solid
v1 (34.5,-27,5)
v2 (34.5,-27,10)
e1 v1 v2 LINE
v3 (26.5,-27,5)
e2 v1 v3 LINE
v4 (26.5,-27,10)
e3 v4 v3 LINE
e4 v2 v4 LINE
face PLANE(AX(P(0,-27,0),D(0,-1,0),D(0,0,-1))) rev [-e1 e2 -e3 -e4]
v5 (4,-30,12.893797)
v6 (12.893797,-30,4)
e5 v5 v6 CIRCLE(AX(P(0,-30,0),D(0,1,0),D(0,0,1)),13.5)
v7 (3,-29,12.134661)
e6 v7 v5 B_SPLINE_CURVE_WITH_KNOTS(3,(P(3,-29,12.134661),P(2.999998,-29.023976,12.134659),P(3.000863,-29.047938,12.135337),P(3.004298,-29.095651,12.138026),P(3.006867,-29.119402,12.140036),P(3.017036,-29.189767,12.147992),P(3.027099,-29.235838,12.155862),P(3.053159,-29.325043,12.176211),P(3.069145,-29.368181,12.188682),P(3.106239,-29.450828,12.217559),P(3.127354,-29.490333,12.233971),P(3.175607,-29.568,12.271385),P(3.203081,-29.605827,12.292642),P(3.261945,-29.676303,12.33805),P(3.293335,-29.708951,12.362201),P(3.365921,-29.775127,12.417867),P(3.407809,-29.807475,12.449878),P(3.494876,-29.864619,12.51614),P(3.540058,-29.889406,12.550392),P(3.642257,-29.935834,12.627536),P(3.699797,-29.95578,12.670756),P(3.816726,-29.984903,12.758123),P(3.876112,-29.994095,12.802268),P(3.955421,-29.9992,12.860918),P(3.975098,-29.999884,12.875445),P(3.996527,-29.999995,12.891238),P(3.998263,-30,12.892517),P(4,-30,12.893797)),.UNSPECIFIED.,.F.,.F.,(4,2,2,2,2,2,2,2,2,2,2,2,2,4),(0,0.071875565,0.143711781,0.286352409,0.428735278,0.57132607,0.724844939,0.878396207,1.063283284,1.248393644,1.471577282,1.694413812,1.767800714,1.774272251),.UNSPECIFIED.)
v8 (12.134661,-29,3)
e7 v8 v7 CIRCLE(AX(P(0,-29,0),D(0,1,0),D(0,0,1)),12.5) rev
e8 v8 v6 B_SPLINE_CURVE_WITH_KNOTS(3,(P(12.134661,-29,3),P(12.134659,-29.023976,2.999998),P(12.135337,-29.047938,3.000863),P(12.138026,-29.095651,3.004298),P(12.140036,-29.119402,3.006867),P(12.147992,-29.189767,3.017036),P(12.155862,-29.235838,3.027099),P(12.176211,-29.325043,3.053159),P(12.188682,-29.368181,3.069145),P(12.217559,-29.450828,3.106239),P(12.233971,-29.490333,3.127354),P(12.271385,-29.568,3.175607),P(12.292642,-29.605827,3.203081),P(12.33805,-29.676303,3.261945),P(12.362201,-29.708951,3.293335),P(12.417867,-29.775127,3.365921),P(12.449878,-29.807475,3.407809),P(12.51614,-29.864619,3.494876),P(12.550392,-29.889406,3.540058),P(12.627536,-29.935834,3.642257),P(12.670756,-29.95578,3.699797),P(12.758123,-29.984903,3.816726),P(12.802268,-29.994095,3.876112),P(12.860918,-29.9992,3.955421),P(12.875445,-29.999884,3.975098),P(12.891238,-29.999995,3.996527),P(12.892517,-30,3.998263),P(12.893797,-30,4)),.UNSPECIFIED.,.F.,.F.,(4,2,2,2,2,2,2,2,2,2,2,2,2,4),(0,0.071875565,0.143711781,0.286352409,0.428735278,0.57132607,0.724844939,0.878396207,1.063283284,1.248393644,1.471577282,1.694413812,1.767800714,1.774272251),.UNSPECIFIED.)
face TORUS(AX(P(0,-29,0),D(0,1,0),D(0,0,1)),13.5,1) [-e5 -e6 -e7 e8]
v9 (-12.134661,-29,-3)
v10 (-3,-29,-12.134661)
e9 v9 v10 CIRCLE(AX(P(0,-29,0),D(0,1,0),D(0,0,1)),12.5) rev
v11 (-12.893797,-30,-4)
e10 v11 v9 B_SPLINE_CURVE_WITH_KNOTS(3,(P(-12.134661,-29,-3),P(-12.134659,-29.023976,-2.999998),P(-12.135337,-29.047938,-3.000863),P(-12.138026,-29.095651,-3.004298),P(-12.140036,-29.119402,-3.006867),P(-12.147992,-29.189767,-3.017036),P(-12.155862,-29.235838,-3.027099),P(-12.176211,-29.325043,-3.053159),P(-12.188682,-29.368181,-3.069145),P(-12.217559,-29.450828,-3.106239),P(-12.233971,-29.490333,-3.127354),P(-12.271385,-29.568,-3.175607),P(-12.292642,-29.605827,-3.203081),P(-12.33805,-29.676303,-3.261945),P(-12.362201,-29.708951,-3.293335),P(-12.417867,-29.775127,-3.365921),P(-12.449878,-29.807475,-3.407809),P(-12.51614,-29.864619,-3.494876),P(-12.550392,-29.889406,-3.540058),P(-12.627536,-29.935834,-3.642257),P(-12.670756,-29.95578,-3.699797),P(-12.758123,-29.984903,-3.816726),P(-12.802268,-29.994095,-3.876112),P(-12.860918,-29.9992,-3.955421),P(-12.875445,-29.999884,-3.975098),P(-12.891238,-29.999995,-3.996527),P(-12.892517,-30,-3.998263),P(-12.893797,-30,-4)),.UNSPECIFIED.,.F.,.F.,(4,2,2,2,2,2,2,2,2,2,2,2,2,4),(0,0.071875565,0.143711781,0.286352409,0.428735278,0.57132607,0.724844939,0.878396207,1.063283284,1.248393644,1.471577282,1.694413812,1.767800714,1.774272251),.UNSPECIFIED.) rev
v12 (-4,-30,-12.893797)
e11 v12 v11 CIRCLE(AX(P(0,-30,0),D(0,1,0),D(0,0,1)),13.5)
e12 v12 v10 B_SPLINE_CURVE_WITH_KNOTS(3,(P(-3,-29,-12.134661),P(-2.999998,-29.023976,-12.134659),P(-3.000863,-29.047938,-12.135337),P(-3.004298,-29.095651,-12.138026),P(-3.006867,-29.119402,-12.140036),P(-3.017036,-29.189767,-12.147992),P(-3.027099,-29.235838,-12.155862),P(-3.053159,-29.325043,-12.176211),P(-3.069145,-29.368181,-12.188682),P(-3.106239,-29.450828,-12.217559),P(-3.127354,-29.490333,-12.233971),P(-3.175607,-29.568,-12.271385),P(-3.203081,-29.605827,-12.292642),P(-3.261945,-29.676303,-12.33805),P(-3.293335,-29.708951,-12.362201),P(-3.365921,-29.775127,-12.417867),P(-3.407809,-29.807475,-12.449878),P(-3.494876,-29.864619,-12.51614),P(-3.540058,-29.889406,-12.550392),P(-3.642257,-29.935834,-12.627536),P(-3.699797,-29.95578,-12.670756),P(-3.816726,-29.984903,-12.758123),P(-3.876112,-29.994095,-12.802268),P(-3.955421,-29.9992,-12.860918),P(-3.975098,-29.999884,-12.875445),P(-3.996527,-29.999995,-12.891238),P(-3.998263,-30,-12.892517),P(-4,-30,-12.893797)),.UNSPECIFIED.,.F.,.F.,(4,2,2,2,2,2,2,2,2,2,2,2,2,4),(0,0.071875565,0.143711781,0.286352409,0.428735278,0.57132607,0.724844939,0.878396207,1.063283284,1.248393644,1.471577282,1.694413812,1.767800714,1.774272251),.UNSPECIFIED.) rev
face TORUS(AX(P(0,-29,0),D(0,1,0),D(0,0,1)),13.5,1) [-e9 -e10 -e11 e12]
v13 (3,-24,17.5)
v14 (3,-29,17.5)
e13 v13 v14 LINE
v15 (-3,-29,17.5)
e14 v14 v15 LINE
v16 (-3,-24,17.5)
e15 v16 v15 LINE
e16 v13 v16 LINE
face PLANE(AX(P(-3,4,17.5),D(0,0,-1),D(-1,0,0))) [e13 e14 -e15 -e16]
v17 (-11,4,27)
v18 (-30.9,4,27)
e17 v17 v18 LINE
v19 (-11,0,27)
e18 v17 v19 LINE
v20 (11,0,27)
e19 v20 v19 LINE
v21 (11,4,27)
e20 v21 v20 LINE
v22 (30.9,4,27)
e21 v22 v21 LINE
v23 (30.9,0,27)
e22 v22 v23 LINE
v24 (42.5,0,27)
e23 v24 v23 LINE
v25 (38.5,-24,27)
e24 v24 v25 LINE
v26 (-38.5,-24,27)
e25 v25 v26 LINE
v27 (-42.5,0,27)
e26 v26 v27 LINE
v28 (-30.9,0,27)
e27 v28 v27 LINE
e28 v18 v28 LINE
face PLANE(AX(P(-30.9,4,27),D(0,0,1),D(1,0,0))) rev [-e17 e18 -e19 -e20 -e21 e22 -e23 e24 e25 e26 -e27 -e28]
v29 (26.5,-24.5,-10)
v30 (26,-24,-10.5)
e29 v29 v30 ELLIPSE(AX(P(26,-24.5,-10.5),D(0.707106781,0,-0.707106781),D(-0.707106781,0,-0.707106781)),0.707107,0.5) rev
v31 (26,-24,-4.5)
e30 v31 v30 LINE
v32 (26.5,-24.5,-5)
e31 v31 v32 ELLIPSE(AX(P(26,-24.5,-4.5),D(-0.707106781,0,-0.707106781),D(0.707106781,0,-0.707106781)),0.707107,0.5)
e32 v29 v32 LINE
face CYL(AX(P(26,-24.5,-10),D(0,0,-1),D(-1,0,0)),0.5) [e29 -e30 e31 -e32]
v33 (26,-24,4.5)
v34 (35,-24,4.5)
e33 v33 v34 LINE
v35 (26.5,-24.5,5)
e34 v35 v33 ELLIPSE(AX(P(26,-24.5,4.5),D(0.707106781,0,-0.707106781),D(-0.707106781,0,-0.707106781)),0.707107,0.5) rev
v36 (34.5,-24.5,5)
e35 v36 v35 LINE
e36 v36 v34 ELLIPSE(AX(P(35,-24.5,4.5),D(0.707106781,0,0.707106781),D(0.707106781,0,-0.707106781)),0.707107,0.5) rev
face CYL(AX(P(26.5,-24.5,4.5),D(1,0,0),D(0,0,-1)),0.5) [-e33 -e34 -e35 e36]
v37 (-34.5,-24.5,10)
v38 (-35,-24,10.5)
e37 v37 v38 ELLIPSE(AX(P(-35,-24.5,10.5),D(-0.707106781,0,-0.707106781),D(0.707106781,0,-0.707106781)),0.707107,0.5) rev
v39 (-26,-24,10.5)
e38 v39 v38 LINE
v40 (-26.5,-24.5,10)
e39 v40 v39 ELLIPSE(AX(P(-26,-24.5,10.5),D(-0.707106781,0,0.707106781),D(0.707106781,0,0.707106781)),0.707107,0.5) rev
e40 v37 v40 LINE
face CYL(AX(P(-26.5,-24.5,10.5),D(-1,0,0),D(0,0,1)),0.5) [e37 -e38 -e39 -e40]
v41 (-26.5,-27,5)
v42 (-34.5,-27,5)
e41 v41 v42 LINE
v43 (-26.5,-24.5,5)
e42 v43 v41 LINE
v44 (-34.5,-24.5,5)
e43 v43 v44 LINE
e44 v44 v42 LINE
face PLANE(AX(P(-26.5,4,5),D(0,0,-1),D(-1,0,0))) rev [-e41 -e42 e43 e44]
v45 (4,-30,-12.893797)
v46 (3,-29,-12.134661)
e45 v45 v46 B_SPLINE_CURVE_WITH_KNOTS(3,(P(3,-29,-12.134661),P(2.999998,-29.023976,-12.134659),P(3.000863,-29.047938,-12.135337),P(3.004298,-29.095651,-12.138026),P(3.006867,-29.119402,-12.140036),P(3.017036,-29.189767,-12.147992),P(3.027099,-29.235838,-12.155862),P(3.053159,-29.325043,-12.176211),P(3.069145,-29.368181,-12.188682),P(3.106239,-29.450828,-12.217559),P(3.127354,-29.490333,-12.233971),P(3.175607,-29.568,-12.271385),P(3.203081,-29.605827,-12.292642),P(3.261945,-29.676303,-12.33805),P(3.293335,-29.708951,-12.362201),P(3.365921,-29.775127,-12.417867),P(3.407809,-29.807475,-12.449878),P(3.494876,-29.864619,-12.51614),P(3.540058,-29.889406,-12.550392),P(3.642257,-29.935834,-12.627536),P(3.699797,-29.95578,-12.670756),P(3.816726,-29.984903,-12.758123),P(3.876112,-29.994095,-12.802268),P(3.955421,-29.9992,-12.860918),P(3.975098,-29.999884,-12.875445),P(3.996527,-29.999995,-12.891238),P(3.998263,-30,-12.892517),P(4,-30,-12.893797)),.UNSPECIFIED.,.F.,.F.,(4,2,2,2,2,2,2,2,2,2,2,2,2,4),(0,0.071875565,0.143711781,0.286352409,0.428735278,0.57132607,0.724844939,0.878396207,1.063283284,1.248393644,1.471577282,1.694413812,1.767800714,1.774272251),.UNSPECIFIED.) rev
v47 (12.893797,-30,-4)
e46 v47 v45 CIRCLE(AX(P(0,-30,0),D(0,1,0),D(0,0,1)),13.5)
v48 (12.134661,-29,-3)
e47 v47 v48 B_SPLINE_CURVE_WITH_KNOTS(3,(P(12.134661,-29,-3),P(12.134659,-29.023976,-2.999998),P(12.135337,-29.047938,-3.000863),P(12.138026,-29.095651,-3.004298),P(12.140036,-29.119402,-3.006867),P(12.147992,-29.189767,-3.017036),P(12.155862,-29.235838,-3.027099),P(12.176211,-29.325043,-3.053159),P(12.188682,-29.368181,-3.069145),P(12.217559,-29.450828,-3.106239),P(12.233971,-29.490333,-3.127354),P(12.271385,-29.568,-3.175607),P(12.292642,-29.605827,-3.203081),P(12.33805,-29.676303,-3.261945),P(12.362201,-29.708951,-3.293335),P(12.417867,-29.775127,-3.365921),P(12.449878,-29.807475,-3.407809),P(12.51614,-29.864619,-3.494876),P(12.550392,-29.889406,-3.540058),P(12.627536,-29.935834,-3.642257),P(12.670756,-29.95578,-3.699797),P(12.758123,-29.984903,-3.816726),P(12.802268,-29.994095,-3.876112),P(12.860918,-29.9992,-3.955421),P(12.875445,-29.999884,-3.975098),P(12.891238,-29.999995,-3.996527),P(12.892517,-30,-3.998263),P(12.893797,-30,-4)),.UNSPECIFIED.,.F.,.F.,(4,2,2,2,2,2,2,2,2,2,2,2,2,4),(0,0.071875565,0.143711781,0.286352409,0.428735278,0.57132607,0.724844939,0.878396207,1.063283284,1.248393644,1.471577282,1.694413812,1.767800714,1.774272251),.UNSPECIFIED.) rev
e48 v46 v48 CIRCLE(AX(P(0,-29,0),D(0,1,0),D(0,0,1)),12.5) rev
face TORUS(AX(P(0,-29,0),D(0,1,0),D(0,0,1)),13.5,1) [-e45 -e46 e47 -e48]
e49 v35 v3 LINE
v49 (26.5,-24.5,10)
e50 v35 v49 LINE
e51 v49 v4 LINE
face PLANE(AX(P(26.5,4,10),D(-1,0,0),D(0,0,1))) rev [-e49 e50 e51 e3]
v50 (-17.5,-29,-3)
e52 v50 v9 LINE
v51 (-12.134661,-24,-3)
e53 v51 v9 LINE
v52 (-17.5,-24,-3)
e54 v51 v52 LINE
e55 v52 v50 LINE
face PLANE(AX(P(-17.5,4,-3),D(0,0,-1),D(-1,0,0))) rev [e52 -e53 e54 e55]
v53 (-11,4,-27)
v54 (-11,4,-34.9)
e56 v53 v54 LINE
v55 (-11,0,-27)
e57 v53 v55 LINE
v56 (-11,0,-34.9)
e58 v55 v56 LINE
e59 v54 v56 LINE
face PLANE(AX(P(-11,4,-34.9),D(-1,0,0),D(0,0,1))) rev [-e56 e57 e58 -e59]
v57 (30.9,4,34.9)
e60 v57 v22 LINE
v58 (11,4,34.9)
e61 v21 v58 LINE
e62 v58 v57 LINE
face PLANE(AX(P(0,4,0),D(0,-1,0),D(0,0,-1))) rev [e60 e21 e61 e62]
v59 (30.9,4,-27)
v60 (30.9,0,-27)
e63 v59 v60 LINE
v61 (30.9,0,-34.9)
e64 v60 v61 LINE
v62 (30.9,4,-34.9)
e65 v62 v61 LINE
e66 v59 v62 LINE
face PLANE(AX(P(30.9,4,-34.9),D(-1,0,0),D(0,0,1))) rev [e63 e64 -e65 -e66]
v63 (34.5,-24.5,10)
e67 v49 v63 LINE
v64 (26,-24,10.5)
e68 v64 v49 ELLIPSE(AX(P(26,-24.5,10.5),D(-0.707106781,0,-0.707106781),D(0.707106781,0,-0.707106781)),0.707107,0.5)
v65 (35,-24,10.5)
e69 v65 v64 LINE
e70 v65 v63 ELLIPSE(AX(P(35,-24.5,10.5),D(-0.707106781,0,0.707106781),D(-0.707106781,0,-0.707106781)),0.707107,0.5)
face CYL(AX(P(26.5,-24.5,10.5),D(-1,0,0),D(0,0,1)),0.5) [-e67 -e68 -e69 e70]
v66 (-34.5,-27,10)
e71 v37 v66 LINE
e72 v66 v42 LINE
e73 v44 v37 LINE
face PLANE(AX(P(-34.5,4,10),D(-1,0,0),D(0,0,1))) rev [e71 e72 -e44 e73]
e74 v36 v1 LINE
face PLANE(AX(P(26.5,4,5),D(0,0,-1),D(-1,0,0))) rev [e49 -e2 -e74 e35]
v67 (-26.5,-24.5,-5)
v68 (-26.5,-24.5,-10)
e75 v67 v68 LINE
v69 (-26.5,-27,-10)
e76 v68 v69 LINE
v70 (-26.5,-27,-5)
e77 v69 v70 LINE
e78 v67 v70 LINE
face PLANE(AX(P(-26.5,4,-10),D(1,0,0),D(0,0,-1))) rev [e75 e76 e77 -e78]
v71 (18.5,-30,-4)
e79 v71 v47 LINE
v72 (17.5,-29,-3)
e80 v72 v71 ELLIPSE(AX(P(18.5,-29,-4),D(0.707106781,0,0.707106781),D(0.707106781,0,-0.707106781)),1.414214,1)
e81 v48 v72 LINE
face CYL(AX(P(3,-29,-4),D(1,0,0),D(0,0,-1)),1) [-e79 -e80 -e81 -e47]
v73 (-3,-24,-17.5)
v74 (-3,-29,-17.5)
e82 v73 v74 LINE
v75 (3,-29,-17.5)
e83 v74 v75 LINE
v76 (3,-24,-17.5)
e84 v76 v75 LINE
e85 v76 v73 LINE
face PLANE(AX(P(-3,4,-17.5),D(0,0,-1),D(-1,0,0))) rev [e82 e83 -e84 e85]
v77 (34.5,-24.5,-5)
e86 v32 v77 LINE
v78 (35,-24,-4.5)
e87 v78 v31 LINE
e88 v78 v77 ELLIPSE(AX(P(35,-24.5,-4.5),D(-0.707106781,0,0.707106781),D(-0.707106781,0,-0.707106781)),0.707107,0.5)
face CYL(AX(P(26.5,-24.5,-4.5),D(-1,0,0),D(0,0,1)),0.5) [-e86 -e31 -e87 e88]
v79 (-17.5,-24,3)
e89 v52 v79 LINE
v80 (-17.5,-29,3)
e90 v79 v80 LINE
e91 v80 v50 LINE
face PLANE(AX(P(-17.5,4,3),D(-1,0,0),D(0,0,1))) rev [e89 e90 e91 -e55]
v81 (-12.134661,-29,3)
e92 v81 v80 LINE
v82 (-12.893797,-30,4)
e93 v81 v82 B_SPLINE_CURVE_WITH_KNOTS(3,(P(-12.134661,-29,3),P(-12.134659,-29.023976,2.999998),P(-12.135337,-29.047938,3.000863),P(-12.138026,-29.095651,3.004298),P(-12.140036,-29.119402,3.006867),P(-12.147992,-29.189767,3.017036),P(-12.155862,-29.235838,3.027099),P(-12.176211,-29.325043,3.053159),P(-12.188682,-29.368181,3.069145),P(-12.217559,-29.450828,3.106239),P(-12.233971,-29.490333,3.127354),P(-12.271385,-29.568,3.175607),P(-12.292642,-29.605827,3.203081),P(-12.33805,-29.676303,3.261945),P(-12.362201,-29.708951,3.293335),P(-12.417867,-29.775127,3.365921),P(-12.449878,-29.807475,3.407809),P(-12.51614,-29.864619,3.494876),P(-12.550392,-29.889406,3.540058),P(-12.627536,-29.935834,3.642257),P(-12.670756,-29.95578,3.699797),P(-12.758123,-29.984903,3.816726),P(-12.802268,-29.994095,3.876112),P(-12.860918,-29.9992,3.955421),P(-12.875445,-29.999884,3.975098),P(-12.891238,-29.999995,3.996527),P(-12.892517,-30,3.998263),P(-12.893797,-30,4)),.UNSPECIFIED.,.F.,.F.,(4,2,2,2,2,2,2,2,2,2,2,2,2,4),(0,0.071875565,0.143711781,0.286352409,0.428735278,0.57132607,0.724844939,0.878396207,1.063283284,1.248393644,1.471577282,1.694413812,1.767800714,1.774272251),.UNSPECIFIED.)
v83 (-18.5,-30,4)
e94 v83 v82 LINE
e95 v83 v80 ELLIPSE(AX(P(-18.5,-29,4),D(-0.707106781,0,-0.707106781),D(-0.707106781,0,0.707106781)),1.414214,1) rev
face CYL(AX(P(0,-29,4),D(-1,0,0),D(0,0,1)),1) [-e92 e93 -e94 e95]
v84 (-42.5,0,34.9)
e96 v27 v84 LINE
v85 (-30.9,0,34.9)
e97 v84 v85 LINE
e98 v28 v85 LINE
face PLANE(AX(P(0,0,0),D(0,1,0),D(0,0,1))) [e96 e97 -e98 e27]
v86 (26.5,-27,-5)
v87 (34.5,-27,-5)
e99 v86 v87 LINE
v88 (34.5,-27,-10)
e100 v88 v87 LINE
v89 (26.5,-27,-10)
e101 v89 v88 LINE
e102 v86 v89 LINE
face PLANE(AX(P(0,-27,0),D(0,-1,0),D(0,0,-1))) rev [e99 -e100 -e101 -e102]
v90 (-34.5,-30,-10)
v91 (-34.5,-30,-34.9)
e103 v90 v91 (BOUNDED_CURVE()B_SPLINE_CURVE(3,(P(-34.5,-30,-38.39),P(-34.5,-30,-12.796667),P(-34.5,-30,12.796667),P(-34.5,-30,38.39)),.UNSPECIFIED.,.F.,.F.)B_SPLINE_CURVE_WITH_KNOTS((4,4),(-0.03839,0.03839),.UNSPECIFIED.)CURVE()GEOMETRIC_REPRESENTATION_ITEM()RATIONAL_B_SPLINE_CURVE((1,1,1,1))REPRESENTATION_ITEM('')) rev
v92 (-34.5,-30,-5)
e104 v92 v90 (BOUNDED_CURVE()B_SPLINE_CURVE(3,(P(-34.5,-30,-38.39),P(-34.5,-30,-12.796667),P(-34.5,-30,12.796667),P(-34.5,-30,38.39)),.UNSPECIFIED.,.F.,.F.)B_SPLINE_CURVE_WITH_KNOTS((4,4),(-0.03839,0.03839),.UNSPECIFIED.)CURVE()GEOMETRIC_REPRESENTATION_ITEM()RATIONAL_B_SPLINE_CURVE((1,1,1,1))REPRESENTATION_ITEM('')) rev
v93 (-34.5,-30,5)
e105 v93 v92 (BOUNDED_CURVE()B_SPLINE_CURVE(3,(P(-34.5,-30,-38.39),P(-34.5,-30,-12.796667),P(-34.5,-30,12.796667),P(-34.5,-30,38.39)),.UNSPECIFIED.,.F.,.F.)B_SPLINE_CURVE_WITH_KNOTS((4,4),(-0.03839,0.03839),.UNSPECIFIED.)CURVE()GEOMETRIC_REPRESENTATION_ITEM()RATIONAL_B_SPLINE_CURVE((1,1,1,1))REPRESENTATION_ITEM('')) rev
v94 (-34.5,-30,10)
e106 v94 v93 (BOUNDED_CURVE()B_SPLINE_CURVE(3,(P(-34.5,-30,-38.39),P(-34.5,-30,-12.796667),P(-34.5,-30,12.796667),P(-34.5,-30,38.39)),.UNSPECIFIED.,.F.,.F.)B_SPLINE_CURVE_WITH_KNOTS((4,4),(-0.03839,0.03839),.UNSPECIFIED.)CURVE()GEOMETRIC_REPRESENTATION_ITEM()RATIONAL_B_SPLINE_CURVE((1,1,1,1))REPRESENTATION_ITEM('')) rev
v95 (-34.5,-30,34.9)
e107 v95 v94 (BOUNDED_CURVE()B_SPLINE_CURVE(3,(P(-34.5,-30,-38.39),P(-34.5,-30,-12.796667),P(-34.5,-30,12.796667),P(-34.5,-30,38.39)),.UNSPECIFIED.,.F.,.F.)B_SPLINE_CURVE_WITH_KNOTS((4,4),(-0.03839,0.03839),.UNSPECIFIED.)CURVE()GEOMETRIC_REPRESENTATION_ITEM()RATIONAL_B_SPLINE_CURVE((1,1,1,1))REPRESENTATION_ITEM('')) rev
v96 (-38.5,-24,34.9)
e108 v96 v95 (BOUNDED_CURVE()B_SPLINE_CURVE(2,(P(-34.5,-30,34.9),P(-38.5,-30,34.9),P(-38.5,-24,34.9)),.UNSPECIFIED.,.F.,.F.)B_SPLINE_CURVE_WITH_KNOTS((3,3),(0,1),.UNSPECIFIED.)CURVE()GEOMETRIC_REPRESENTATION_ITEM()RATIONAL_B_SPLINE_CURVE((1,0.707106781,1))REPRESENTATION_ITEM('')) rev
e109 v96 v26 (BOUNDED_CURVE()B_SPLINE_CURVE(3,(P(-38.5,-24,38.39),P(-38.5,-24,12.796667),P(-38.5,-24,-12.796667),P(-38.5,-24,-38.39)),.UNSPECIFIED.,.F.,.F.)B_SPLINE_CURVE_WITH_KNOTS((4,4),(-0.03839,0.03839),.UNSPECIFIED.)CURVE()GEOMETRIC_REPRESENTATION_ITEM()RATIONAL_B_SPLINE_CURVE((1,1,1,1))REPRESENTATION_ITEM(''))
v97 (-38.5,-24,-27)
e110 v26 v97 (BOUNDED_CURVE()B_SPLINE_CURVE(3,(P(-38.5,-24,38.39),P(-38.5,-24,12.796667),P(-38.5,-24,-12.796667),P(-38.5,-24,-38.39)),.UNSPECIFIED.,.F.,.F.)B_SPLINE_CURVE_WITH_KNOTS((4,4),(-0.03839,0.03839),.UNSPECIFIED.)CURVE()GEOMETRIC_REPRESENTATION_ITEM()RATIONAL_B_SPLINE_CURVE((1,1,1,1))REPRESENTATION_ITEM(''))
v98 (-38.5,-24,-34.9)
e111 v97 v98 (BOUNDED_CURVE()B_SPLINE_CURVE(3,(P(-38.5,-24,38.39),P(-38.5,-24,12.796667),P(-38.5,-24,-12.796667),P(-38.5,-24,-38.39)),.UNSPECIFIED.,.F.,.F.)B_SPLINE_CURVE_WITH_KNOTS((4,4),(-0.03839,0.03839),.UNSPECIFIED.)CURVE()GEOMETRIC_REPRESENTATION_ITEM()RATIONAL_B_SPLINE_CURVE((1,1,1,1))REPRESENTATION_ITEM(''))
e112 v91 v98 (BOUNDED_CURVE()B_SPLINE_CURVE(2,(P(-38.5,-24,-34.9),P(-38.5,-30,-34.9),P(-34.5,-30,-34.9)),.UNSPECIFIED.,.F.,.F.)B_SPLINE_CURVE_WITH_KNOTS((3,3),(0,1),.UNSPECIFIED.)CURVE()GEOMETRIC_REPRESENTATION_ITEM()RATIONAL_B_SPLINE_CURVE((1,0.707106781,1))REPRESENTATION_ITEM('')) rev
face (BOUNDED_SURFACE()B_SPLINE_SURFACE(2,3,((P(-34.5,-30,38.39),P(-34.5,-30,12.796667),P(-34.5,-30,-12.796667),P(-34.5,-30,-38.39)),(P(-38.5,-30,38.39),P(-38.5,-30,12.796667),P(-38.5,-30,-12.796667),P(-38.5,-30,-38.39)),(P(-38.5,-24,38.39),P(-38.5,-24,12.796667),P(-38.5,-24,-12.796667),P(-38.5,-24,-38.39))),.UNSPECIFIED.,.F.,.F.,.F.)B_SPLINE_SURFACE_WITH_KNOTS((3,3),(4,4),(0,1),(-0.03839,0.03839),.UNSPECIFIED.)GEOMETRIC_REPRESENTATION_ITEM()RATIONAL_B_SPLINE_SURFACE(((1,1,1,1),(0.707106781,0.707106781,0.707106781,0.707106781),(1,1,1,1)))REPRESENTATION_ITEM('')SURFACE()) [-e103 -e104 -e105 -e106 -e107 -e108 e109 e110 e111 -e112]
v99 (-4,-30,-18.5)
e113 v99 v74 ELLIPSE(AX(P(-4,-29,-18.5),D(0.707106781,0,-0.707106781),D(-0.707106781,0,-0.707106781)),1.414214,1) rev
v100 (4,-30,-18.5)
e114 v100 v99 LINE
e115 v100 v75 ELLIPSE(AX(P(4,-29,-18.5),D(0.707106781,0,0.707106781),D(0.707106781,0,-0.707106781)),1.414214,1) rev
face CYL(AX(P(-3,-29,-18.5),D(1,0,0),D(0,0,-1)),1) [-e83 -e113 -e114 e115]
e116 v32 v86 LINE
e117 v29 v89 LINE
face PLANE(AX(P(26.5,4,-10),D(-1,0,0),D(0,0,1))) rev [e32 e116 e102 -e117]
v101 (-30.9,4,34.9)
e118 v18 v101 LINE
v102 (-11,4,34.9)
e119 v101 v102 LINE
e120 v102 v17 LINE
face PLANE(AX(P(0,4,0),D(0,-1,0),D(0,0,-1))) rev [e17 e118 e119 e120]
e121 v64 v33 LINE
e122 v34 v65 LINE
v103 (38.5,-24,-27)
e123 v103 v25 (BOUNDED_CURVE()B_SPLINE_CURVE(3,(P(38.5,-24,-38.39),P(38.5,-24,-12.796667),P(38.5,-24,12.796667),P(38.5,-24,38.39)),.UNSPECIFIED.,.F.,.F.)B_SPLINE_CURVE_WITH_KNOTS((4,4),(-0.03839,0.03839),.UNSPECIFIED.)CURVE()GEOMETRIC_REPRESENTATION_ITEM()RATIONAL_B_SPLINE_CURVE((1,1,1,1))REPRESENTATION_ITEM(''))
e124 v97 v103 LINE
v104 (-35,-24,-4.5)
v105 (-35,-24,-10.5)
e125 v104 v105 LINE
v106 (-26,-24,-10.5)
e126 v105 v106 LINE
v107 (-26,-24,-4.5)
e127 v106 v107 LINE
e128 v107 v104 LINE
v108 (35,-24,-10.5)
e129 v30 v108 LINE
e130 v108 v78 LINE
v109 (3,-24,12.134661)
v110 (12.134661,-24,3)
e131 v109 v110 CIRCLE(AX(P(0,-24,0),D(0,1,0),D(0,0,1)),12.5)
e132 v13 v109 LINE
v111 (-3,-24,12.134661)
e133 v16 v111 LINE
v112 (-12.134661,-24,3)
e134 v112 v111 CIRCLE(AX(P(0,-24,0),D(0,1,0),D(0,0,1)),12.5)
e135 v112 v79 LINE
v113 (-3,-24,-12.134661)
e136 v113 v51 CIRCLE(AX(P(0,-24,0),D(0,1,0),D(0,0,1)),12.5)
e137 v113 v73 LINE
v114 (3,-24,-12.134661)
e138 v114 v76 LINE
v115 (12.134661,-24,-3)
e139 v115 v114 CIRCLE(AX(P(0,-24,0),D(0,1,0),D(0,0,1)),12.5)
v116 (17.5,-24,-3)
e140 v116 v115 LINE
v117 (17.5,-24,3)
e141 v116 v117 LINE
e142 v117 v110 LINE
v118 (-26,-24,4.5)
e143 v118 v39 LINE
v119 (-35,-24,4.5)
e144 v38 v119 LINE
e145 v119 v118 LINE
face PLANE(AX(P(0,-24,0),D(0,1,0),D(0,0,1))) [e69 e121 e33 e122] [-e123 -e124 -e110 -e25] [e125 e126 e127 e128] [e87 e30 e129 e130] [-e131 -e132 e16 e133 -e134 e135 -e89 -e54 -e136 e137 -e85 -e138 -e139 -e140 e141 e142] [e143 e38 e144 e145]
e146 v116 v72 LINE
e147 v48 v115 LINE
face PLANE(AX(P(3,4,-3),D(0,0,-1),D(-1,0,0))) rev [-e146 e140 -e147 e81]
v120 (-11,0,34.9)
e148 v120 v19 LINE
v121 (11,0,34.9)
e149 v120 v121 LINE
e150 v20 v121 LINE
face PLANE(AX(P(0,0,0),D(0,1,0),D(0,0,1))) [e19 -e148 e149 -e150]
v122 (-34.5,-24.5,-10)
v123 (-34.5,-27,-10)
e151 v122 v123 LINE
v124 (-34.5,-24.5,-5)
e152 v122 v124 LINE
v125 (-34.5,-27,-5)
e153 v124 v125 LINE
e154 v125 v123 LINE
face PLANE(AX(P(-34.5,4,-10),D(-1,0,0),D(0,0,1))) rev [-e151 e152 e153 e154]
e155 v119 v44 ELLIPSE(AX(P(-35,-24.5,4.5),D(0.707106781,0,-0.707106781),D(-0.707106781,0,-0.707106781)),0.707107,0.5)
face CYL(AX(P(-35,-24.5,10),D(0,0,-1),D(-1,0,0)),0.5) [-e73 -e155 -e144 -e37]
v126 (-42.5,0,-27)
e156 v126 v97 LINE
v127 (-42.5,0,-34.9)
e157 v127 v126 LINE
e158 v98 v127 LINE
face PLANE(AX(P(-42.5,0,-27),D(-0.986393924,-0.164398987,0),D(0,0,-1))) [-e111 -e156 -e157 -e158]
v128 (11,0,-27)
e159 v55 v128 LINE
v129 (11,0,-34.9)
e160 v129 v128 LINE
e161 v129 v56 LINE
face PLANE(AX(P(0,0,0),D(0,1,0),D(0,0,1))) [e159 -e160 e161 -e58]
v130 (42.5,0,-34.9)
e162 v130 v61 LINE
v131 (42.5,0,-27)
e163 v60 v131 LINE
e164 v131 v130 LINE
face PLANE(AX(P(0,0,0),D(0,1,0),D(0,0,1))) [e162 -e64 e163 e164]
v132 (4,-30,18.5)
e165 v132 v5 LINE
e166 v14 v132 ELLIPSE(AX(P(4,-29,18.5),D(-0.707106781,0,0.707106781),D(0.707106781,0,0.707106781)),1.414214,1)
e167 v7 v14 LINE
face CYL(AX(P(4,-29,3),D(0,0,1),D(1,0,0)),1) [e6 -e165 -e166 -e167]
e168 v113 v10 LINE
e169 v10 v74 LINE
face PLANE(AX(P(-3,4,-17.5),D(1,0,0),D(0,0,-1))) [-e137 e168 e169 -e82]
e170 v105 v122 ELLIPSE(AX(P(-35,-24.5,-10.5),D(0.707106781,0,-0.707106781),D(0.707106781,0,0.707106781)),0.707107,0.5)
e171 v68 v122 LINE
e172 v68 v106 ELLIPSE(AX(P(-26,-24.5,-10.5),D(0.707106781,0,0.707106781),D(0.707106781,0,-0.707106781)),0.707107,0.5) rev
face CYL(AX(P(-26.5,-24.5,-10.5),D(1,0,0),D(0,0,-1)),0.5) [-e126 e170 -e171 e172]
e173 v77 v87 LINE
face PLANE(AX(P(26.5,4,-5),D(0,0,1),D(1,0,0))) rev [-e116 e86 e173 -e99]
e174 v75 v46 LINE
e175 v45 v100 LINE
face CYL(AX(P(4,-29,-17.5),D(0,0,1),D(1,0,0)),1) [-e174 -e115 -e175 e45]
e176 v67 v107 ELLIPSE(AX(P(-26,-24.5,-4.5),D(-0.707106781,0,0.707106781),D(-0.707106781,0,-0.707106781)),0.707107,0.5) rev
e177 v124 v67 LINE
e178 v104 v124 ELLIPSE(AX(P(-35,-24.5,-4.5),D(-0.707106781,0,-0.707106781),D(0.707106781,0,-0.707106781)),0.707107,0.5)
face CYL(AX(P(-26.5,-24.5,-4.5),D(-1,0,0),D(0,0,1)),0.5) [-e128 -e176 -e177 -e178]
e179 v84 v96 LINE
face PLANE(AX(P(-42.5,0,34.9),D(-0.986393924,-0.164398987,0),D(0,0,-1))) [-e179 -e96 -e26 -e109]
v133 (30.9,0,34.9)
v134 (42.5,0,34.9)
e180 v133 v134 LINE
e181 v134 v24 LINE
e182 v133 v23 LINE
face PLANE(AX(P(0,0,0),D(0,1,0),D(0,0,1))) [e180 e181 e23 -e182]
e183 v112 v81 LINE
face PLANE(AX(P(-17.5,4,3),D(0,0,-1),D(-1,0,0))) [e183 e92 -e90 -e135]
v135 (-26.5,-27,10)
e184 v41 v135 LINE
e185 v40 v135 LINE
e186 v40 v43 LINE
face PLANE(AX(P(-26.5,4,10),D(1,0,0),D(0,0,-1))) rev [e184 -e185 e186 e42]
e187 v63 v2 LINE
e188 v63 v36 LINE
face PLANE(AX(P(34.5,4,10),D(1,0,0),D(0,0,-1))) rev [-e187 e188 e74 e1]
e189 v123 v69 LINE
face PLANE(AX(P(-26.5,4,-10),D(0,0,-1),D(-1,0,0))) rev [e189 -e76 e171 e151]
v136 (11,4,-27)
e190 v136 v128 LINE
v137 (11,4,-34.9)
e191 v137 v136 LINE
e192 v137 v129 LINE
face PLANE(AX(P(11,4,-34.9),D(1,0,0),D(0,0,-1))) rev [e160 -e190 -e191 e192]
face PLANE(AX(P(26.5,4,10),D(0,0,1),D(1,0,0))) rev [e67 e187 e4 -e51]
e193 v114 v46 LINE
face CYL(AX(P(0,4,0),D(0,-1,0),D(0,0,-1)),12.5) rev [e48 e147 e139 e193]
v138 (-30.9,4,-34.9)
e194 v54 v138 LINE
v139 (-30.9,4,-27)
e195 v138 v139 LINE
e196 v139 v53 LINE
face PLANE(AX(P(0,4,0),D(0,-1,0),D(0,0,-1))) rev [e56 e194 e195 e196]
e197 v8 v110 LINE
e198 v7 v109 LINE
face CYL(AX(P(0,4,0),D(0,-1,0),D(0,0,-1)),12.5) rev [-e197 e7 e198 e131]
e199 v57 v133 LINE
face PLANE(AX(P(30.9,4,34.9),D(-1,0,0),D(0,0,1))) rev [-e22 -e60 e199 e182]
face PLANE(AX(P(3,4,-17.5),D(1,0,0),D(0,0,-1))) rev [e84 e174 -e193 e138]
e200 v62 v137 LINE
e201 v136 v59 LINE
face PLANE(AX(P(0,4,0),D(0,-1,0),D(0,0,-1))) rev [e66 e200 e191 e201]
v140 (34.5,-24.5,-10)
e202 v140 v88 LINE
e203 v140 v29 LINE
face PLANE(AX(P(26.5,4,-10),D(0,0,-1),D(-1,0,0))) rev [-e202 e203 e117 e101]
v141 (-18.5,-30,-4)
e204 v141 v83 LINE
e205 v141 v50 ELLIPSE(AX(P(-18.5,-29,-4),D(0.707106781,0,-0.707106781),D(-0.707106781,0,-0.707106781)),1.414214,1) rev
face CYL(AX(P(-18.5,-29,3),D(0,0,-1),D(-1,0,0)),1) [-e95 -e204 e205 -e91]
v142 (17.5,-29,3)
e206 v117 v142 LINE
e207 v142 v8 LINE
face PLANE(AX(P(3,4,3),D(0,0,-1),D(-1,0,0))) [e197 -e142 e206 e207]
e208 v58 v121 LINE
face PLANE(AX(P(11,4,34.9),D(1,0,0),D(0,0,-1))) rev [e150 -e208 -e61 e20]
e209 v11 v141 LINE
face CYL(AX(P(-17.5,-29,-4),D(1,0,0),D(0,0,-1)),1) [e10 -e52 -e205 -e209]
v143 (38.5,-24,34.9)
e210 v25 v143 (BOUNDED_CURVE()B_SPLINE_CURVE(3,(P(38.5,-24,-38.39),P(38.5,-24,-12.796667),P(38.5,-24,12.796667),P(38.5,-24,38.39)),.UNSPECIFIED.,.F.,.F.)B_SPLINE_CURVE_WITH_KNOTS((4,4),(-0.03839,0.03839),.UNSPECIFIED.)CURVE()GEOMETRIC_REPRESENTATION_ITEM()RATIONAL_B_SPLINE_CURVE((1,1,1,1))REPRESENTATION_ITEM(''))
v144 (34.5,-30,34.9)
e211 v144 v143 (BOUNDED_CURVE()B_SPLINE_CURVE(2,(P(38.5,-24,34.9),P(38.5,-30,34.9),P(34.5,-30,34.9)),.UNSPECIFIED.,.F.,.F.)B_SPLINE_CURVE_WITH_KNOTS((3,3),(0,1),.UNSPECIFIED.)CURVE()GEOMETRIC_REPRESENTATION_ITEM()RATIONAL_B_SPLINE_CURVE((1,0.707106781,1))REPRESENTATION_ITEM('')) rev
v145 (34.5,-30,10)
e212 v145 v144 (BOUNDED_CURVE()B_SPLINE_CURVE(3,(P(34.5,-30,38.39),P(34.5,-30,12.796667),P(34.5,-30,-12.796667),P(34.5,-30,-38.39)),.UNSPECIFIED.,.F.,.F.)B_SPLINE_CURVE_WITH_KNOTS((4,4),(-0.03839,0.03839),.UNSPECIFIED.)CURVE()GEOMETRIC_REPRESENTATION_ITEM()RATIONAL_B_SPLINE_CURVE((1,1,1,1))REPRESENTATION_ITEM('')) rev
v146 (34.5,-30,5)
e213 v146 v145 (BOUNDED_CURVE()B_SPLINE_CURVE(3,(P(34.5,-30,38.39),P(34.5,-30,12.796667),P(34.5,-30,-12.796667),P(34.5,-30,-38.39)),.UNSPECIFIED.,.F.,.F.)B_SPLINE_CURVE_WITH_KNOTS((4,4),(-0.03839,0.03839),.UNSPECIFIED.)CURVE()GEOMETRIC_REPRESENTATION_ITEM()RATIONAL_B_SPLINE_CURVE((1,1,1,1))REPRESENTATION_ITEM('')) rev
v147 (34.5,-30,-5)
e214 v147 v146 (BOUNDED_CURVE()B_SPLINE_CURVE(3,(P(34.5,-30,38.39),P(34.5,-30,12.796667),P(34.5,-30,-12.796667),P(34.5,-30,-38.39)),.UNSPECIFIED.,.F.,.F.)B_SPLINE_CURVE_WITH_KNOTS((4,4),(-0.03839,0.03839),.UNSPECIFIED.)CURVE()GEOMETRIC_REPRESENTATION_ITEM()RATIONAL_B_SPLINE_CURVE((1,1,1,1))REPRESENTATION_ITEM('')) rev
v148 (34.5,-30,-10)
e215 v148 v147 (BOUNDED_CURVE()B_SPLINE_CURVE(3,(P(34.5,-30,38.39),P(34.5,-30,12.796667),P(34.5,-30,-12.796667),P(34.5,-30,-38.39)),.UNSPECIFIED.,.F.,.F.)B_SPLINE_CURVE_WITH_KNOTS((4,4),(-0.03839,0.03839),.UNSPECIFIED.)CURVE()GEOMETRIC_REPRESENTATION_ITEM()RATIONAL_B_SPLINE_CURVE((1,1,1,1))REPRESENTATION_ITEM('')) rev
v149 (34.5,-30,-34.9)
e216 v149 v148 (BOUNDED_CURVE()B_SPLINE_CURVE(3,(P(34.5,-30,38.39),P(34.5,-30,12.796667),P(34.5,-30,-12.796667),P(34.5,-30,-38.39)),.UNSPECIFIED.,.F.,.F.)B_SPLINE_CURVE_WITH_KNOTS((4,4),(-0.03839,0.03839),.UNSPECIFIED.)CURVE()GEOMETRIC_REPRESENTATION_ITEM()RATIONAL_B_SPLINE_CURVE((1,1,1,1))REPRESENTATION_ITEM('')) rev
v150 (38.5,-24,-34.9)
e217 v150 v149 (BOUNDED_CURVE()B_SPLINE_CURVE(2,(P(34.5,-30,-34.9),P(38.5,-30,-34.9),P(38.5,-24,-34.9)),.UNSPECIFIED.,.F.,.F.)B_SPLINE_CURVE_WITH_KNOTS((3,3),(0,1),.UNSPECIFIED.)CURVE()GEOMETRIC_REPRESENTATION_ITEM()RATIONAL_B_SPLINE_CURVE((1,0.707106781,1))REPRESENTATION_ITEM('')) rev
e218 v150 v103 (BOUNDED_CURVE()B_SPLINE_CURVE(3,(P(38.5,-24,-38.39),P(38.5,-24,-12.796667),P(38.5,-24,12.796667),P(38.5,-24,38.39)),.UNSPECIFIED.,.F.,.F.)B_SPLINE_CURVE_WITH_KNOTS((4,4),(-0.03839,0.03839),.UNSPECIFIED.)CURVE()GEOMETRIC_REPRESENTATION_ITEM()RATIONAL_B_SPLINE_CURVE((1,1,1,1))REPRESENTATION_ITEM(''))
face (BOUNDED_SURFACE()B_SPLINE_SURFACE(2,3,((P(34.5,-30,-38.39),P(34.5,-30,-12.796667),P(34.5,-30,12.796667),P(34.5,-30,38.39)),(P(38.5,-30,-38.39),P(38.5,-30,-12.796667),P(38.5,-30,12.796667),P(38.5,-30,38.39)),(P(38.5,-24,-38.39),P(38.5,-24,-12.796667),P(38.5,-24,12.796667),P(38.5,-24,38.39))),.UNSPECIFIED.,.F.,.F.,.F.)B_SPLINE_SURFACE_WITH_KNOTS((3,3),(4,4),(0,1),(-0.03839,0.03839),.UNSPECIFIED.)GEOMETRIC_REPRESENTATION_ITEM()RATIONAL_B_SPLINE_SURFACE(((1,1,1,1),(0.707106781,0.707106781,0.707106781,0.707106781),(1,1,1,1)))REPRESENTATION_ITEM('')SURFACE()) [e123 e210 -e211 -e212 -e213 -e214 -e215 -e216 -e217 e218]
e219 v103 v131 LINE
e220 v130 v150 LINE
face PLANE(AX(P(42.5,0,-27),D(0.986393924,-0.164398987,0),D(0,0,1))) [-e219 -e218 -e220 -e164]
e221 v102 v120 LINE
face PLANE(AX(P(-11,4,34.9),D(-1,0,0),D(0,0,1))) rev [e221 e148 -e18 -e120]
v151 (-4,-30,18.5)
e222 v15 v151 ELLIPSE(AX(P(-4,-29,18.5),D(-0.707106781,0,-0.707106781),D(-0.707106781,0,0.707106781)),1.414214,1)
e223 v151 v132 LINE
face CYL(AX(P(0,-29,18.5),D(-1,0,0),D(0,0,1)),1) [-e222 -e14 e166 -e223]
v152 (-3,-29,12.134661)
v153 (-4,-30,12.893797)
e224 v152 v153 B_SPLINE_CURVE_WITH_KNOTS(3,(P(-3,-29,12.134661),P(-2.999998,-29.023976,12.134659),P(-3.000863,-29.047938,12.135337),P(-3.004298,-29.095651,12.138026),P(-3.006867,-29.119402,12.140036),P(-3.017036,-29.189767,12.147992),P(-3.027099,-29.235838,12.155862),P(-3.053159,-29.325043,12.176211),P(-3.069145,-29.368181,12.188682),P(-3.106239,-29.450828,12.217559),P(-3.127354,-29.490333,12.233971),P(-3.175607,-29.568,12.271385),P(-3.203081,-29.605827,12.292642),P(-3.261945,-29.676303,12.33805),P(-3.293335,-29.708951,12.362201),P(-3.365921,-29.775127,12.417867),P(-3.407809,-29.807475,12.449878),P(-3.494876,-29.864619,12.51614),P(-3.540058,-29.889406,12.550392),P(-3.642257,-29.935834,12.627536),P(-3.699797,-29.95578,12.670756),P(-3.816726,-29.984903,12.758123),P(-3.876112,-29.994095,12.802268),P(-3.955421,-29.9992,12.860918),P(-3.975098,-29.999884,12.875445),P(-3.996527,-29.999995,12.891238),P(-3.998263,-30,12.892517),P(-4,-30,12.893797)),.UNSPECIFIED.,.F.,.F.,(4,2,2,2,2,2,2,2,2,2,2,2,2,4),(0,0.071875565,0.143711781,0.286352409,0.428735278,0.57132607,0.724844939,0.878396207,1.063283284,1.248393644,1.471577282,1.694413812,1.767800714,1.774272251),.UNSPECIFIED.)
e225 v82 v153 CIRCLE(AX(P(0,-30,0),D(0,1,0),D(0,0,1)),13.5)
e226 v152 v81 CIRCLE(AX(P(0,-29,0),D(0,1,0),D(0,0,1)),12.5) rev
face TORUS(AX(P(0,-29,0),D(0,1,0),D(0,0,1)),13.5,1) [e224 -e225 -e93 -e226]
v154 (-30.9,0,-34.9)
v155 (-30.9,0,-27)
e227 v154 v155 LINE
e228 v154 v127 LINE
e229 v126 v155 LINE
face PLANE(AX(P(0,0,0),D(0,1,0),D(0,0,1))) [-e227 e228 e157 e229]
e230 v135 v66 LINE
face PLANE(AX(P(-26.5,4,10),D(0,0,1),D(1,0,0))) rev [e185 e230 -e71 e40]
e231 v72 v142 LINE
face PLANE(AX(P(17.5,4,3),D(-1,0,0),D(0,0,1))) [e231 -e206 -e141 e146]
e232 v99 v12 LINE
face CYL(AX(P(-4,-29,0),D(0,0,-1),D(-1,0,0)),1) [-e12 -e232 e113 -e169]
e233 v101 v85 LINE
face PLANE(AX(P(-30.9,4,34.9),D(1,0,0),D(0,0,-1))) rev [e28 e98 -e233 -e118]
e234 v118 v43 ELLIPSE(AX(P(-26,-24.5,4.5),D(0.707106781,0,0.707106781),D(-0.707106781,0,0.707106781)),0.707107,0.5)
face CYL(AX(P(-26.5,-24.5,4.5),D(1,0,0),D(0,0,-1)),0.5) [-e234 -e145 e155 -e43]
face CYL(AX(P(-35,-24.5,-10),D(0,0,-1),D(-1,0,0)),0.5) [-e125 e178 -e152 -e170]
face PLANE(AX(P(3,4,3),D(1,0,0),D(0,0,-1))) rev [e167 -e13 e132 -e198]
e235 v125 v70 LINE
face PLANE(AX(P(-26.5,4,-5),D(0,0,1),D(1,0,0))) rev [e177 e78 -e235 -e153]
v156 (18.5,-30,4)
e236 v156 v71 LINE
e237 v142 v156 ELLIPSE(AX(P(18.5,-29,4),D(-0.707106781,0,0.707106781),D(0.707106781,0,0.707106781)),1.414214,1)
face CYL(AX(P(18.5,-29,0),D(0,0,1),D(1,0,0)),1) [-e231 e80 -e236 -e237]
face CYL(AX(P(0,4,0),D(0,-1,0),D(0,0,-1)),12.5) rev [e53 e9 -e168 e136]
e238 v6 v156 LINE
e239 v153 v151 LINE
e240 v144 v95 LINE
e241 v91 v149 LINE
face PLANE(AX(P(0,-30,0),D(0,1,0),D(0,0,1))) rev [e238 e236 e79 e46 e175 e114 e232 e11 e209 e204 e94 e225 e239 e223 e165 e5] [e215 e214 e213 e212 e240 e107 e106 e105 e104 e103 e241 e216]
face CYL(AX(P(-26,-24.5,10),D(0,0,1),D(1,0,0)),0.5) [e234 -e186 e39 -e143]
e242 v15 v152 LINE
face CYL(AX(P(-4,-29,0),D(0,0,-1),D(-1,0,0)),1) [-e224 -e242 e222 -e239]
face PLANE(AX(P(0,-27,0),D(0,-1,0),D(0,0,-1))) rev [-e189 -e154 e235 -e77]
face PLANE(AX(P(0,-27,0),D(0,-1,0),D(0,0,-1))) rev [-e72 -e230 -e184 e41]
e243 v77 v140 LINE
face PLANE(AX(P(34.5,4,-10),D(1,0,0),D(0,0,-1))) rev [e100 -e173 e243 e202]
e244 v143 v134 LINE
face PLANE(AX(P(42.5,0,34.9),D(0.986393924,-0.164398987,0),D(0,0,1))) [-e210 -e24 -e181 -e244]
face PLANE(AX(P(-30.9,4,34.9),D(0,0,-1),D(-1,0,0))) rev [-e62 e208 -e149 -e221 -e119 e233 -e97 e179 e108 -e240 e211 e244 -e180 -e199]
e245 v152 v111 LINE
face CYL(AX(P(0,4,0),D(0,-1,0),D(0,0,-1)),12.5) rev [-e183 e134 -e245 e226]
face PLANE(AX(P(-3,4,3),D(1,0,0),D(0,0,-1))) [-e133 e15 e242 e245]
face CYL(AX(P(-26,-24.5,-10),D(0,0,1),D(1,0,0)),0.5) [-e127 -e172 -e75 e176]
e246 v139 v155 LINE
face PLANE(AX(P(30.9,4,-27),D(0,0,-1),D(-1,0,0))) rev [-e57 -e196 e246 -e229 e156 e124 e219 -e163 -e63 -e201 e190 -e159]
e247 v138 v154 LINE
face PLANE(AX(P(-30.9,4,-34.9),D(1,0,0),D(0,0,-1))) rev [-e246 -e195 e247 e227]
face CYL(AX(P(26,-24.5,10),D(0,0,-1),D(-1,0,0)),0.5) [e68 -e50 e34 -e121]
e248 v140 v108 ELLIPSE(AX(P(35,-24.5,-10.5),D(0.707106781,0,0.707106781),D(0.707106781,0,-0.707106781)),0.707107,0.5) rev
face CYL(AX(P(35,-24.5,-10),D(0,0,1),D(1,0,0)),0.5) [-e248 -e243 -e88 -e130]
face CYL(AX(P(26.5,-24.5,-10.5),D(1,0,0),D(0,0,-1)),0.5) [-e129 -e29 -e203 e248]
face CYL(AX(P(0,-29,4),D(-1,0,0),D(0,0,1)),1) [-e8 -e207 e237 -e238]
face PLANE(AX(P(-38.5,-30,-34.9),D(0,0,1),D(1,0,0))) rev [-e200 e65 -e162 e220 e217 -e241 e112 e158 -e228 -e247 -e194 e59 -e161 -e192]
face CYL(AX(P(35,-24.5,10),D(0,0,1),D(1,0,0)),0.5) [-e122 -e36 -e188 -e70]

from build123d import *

# Parameters (mm, degrees)
SKETCH1_W             = 19.9
SKETCH1_H             = 7.9
BOSS_EXTRUDE1_DEPTH   = 4
BOSS_EXTRUDE1_2_DEPTH = 4
BOSS_EXTRUDE1_3_DEPTH = 4
BOSS_EXTRUDE1_4_DEPTH = 4
SKETCH2_W             = 85
SKETCH2_H             = 7.9
BOSS_EXTRUDE2_DEPTH   = 24
CHAMFER1_START        = -36
CHAMFER1_DEPTH        = 10
CHAMFER2_SIZE         = 24
CHAMFER2_SIZE_2       = 4
SKETCH4_W             = 77
SKETCH4_H             = 69.8
BOSS_EXTRUDE3_DEPTH   = 6
FILLET1_SIZE          = 6
FILLET1_SIZE_2        = 4
SKETCH7_W             = 8
SKETCH7_H             = 5
CUT_EXTRUDE3_DEPTH    = 65.654930379
SKETCH8_W             = 8
SKETCH8_H             = 20
BOSS_EXTRUDE4_DEPTH   = 3
SKETCH9_R             = 12.5
CUT_EXTRUDE4_DEPTH    = 65.654930379
CUT_EXTRUDE5_DEPTH    = 65.654930379
FILLET2_R             = 1
FILLET3_R             = 0.5


with BuildPart() as part:
    # Sketch1 → Boss-Extrude1 (new body)
    with BuildSketch(Plane(origin=(0, 0, 0), x_dir=(1, 0, 0), z_dir=(0, 1, 0))):
        with Locations((20.95, 30.95)):
            Rectangle(SKETCH1_W, SKETCH1_H)
    extrude(amount=BOSS_EXTRUDE1_DEPTH)



with BuildPart() as body_2:
    # Sketch1 → Boss-Extrude1 2 (new body)
    with BuildSketch(Plane(origin=(0, 0, 0), x_dir=(1, 0, 0), z_dir=(0, 1, 0))):
        with Locations((-20.95, -30.95)):
            Rectangle(SKETCH1_W, SKETCH1_H)
    extrude(amount=BOSS_EXTRUDE1_2_DEPTH)


with BuildPart() as body_3:
    # Sketch1 → Boss-Extrude1 3 (new body)
    with BuildSketch(Plane(origin=(0, 0, 0), x_dir=(1, 0, 0), z_dir=(0, 1, 0))):
        with Locations((20.95, -30.95)):
            Rectangle(SKETCH1_W, SKETCH1_H)
    extrude(amount=BOSS_EXTRUDE1_3_DEPTH)


with BuildPart() as body_4:
    # Sketch1 → Boss-Extrude1 4 (new body)
    with BuildSketch(Plane(origin=(0, 0, 0), x_dir=(1, 0, 0), z_dir=(0, 1, 0))):
        with Locations((-20.95, 30.95)):
            Rectangle(SKETCH1_W, SKETCH1_H)
    extrude(amount=BOSS_EXTRUDE1_4_DEPTH)


with BuildPart() as part_1:
    add(part.part)

    add(body_2.part)  # Boss-Extrude2 merges body 2

    add(body_3.part)  # Boss-Extrude2 merges body 3

    add(body_4.part)  # Boss-Extrude2 merges body 4
    # Sketch2 → Boss-Extrude2 (add)
    with BuildSketch(Plane(origin=(0, 0, 0), x_dir=(1, 0, 0), z_dir=(0, 1, 0))):
        with Locations((0, 30.95)):
            Rectangle(SKETCH2_W, SKETCH2_H)
        with Locations((0, -30.95)):
            Rectangle(SKETCH2_W, SKETCH2_H)
    extrude(amount=-BOSS_EXTRUDE2_DEPTH)

    # Chamfer1: read off the stored shape, not the designer's step
    # Chamfer1 outline → Chamfer1 (cut)
    with BuildSketch(Plane.XY.offset(CHAMFER1_START)):
        Polygon((-42.5, -24), (-38.5, -24), (-42.5, 0), align=None)
        Polygon((42.5, 0), (38.5, -24), (42.5, -24), align=None)
    extrude(amount=CHAMFER1_DEPTH, mode=Mode.SUBTRACT)

    # Chamfer2
    # the kernel refuses this chamfer: 24, 4 mm, written as the material it takes off along each edge
    with BuildSketch(Plane(origin=(42.5, -24, -35.368593459), x_dir=(0, 1, 0), z_dir=(0, 0, 1))) as chamfer2_piece_1:
        Polygon((CHAMFER2_SIZE, 0), (0, CHAMFER2_SIZE_2), (0, 0), align=None)
    extrude(amount=132.637186918, mode=Mode.SUBTRACT)
    with BuildSketch(Plane(origin=(-42.5, -24, 97.268593459), x_dir=(1, 0, 0), z_dir=(0, 0, -1))) as chamfer2_piece_2:
        Polygon((CHAMFER2_SIZE_2, 0), (0, -CHAMFER2_SIZE), (0, 0), align=None)
    extrude(amount=132.637186918, mode=Mode.SUBTRACT)

    # Sketch4 → Boss-Extrude3 (add)
    with BuildSketch(Plane.XZ.offset(24)):
        Rectangle(SKETCH4_W, SKETCH4_H)
    extrude(amount=BOSS_EXTRUDE3_DEPTH)

    # Fillet1
    # a fillet whose section is not a circle: 6, 4 mm, written as the material it takes off along each edge
    with BuildSketch(Plane(origin=(38.5, -30, -49.9), x_dir=(0, 1, 0), z_dir=(0, 0, 1)), Plane(origin=(-38.5, -30, 49.9), x_dir=(0, 1, 0), z_dir=(0, 0, -1))) as fillet1_piece_1:
        with BuildLine():
            Bezier((FILLET1_SIZE, 0), (0, 0), (0, FILLET1_SIZE_2), weights=[1, 0.707106781, 1])
            Line((0, FILLET1_SIZE_2), (0, 0))
            Line((0, 0), (FILLET1_SIZE, 0))
        make_face()
    extrude(amount=99.8, mode=Mode.SUBTRACT)

    # Sketch7 → Cut-Extrude3 (cut, through all)
    with BuildSketch(Plane.XZ.offset(30)):
        with Locations((-30.5, -7.5)):
            Rectangle(SKETCH7_W, SKETCH7_H)
        with Locations((-30.5, 7.5)):
            Rectangle(SKETCH7_W, SKETCH7_H)
        with Locations((30.5, 7.5)):
            Rectangle(SKETCH7_W, SKETCH7_H)
        with Locations((30.5, -7.5)):
            Rectangle(SKETCH7_W, SKETCH7_H)
    extrude(amount=-CUT_EXTRUDE3_DEPTH, mode=Mode.SUBTRACT)

    # Sketch8 → Boss-Extrude4 (add)
    with BuildSketch(Plane.XZ.offset(30)):
        with Locations((-30.5, 0)):
            Rectangle(SKETCH8_W, SKETCH8_H)
        with Locations((30.5, 0)):
            Rectangle(SKETCH8_W, SKETCH8_H)
    extrude(amount=-BOSS_EXTRUDE4_DEPTH)

    # Sketch9 → Cut-Extrude4 (cut, through all)
    with BuildSketch(Plane.XZ.offset(30)):
        with Locations(Location((0, 0, 0), (0, 0, 270))):
            Circle(SKETCH9_R)
    extrude(amount=-CUT_EXTRUDE4_DEPTH, mode=Mode.SUBTRACT)

    # Sketch10 → Cut-Extrude5 (cut, through all)
    with BuildSketch(Plane.XZ.offset(30)):
        Polygon((3, 3), (17.5, 3), (17.5, -3), (3, -3), (3, -17.5), (-3, -17.5), (-3, -3), (-17.5, -3), (-17.5, 3), (-3, 3), (-3, 17.5), (3, 17.5), align=None)
    extrude(amount=-CUT_EXTRUDE5_DEPTH, mode=Mode.SUBTRACT)

    # Fillet2
    fillet2_edges = [part_1.edges().sort_by_distance(p)[0] for p in [
        (8.838834765, -30, -8.838834765),
        (8.838834765, -30, 8.838834765),
        (-8.838834765, -30, 8.838834765),
        (-8.838834765, -30, -8.838834765),
        (-17.5, -30, 0),
        (-14.81733055, -30, -3),
        (0, -30, -17.5),
        (3, -30, -14.81733055),
        (14.81733055, -30, -3),
        (3, -30, 14.81733055),
        (-3, -30, -14.81733055),
        (-14.81733055, -30, 3),
        (-3, -30, 14.81733055),
        (0, -30, 17.5),
        (14.81733055, -30, 3),
        (17.5, -30, 0),
    ]]
    fillet(fillet2_edges, radius=FILLET2_R)

    # Fillet3
    fillet3_edges = [part_1.edges().sort_by_distance(p)[0] for p in [
        (26.5, -24, 7.5),
        (30.5, -24, 5),
        (30.5, -24, 10),
        (34.5, -24, 7.5),
        (26.5, -24, -7.5),
        (30.5, -24, -10),
        (30.5, -24, -5),
        (34.5, -24, -7.5),
        (-30.5, -24, -10),
        (-34.5, -24, -7.5),
        (-30.5, -24, -5),
        (-26.5, -24, -7.5),
        (-26.5, -24, 7.5),
        (-34.5, -24, 7.5),
        (-30.5, -24, 10),
        (-30.5, -24, 5),
    ]]
    fillet(fillet3_edges, radius=FILLET3_R)


solid = part_1.part
